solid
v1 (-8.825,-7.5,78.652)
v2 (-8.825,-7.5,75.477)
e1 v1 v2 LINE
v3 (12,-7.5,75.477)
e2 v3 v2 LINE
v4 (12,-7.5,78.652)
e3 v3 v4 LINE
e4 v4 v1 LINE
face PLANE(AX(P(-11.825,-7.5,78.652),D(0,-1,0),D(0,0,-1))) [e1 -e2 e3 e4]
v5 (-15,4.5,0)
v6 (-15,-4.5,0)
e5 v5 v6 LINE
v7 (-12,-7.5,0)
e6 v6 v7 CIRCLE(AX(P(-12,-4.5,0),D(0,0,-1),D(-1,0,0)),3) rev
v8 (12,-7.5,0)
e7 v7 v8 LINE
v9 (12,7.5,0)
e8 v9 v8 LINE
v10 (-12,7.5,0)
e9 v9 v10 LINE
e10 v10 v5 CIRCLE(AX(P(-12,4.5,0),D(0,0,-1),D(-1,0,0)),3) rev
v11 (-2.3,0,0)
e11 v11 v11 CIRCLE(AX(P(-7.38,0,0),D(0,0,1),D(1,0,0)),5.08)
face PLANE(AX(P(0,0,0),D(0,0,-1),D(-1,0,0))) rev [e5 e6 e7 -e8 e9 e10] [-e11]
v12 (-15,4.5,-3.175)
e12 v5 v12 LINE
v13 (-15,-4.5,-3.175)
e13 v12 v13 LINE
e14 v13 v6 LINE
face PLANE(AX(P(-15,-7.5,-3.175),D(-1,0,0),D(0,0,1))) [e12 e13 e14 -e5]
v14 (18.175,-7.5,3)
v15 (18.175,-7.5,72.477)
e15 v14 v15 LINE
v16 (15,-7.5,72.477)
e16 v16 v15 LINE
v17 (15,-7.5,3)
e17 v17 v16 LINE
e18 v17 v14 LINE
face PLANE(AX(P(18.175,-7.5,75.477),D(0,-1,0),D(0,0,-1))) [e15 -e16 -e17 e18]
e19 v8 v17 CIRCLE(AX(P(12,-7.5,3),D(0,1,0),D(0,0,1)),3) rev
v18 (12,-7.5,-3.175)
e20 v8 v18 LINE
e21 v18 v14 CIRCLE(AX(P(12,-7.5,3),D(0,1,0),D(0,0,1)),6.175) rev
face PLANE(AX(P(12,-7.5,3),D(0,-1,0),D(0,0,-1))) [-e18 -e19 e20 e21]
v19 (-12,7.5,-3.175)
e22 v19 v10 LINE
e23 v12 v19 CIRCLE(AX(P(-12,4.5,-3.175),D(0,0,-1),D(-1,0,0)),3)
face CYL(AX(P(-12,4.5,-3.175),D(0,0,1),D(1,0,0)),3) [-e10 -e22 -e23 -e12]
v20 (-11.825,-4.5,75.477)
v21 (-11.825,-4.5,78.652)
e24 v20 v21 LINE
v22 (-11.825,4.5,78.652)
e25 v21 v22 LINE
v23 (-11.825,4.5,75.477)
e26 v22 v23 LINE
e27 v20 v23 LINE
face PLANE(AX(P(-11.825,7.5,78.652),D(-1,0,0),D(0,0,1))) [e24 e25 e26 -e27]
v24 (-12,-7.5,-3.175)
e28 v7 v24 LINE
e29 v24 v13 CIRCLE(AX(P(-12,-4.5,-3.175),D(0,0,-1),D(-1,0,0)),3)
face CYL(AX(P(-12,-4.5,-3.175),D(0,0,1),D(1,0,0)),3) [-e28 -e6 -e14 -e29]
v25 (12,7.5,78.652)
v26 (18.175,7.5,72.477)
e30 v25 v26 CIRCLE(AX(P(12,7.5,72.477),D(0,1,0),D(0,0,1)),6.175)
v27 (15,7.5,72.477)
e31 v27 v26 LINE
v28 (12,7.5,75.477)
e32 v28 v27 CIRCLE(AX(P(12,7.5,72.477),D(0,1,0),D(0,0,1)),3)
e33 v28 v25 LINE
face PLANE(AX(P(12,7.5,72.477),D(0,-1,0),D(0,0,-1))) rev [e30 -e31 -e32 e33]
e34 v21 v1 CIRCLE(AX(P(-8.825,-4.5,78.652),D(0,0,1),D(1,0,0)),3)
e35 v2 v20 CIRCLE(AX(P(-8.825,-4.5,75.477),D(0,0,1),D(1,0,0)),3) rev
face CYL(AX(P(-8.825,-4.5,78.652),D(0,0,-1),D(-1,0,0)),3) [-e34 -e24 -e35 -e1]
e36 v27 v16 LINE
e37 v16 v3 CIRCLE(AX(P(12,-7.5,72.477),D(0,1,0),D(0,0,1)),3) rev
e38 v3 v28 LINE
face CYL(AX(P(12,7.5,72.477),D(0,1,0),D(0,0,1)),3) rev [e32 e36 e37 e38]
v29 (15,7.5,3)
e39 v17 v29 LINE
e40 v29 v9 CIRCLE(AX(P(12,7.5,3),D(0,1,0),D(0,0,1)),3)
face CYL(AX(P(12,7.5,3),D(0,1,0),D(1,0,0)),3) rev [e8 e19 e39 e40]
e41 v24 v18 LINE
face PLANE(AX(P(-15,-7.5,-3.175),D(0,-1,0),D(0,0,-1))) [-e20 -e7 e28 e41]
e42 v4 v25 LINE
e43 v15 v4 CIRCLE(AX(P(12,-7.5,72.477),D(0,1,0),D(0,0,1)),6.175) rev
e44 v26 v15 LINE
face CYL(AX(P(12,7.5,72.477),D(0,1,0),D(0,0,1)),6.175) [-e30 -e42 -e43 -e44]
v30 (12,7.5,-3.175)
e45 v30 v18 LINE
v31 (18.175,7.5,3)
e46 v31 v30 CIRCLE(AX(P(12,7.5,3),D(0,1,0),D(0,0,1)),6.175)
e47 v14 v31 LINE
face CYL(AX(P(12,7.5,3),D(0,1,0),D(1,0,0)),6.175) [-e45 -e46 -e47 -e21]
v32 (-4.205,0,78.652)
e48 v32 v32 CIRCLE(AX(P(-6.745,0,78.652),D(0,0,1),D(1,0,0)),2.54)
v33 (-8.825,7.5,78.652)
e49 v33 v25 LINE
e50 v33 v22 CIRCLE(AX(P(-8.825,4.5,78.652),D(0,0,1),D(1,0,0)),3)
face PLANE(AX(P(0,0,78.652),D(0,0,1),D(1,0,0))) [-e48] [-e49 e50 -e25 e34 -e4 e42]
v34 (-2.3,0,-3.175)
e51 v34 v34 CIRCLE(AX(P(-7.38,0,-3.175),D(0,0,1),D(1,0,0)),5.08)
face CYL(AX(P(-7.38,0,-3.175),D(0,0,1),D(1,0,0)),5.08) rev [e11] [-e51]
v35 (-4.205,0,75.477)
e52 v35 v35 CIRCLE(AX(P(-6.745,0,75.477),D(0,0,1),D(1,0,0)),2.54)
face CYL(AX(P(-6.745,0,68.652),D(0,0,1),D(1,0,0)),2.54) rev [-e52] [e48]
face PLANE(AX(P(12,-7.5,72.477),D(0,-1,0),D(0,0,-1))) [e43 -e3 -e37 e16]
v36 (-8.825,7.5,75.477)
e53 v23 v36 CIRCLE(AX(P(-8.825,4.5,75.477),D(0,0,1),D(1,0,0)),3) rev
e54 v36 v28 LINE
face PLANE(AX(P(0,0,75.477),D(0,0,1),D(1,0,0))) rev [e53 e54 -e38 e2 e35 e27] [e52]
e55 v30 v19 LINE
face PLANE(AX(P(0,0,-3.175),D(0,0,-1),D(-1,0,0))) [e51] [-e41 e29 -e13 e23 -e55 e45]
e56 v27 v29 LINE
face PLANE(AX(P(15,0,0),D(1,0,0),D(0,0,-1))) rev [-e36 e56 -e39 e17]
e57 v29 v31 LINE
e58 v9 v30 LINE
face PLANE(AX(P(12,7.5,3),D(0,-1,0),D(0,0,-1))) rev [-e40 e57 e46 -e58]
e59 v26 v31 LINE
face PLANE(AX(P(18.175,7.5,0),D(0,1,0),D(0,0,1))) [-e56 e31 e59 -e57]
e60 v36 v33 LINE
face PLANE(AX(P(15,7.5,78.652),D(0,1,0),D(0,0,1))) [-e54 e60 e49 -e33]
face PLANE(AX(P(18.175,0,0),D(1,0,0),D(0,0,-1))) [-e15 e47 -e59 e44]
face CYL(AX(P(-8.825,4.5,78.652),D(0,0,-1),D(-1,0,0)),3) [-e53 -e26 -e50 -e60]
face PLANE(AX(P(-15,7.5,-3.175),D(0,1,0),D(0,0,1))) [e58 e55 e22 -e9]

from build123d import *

# Parameters (mm, degrees)
SKETCH1_W                    = 30
SKETCH1_H                    = 15
BASE_FLANGE1_DEPTH           = 3.175
EDGE_FLANGE1_STRIP_W         = 18.7
EDGE_FLANGE1_STRIP_H         = 3.175
EDGE_FLANGE1_STRIP_CUT_DEPTH = 15
EDGE_FLANGE1_DEPTH           = 15
EDGE_FLANGE2_STRIP_W         = 18.7
EDGE_FLANGE2_STRIP_H         = 3.175
EDGE_FLANGE2_STRIP_CUT_DEPTH = 15
EDGE_FLANGE2_DEPTH           = 15
SKETCH14_R                   = 5.08
CUT_EXTRUDE1_DEPTH           = 82.072299394
SKETCH15_R                   = 2.54
CUT_EXTRUDE2_DEPTH           = 10
FILLET1_R                    = 3


# Sheet-metal steps are written as plain solids
with BuildPart() as part:
    # Sketch1 → Base-Flange1 (new body)
    with BuildSketch(Plane.XY):
        Rectangle(SKETCH1_W, SKETCH1_H)
    extrude(amount=-BASE_FLANGE1_DEPTH)

    # Edge-Flange1 strip (across the edge) → Edge-Flange1 strip cut (cut)
    with BuildSketch(Plane(origin=(15, -7.5, 0), x_dir=(-1, 0, 0), z_dir=(0, 1, 0))):
        with Locations((-6.35, -1.5875)):
            Rectangle(EDGE_FLANGE1_STRIP_W, EDGE_FLANGE1_STRIP_H)
    extrude(amount=EDGE_FLANGE1_STRIP_CUT_DEPTH, mode=Mode.SUBTRACT)

    # Edge-Flange1 section (across the edge) → Edge-Flange1 (add)
    with BuildSketch(Plane(origin=(15, -7.5, 0), x_dir=(-1, 0, 0), z_dir=(0, 1, 0))):
        with BuildLine():
            Line((-3.175, 3), (-3.175, 75.477))
            Line((-3.175, 75.477), (0, 75.477))
            Line((0, 75.477), (0, 3))
            ThreePointArc((0, 3), (0.878679656, 0.878679656), (3, 0))
            Line((3, 0), (3, -3.175))
            ThreePointArc((3, -3.175), (-1.366384374, -1.366384374), (-3.175, 3))
        make_face()
    extrude(amount=EDGE_FLANGE1_DEPTH)

    # Edge-Flange2 strip (across the edge) → Edge-Flange2 strip cut (cut)
    with BuildSketch(Plane(origin=(15, -7.5, 75.477), x_dir=(0, 0, -1), z_dir=(0, 1, 0))):
        with Locations((-6.35, -1.5875)):
            Rectangle(EDGE_FLANGE2_STRIP_W, EDGE_FLANGE2_STRIP_H)
    extrude(amount=EDGE_FLANGE2_STRIP_CUT_DEPTH, mode=Mode.SUBTRACT)

    # Edge-Flange2 section (across the edge) → Edge-Flange2 (add)
    with BuildSketch(Plane(origin=(15, -7.5, 75.477), x_dir=(0, 0, -1), z_dir=(0, 1, 0))):
        with BuildLine():
            Line((-3.175, 3), (-3.175, 26.825))
            Line((-3.175, 26.825), (0, 26.825))
            Line((0, 26.825), (0, 3))
            ThreePointArc((0, 3), (0.878679656, 0.878679656), (3, 0))
            Line((3, 0), (3, -3.175))
            ThreePointArc((3, -3.175), (-1.366384374, -1.366384374), (-3.175, 3))
        make_face()
    extrude(amount=EDGE_FLANGE2_DEPTH)

    # Sketch14 → Cut-Extrude1 (cut, through all)
    with BuildSketch(Plane.XY):
        with Locations((-7.38, 0)):
            Circle(SKETCH14_R)
    extrude(amount=-CUT_EXTRUDE1_DEPTH, mode=Mode.SUBTRACT)

    # Sketch15 → Cut-Extrude2 (cut)
    with BuildSketch(Plane.XY.offset(78.652)):
        with Locations((-6.745, 0)):
            Circle(SKETCH15_R)
    extrude(amount=-CUT_EXTRUDE2_DEPTH, mode=Mode.SUBTRACT)

    # Fillet1
    fillet1_edges = [part.edges().sort_by_distance(p)[0] for p in [
        (-11.825, -7.5, 77.0645),
        (-11.825, 7.5, 77.0645),
        (-15, -7.5, -1.5875),
        (-15, 7.5, -1.5875),
    ]]
    fillet(fillet1_edges, radius=FILLET1_R)


solid = part.part
